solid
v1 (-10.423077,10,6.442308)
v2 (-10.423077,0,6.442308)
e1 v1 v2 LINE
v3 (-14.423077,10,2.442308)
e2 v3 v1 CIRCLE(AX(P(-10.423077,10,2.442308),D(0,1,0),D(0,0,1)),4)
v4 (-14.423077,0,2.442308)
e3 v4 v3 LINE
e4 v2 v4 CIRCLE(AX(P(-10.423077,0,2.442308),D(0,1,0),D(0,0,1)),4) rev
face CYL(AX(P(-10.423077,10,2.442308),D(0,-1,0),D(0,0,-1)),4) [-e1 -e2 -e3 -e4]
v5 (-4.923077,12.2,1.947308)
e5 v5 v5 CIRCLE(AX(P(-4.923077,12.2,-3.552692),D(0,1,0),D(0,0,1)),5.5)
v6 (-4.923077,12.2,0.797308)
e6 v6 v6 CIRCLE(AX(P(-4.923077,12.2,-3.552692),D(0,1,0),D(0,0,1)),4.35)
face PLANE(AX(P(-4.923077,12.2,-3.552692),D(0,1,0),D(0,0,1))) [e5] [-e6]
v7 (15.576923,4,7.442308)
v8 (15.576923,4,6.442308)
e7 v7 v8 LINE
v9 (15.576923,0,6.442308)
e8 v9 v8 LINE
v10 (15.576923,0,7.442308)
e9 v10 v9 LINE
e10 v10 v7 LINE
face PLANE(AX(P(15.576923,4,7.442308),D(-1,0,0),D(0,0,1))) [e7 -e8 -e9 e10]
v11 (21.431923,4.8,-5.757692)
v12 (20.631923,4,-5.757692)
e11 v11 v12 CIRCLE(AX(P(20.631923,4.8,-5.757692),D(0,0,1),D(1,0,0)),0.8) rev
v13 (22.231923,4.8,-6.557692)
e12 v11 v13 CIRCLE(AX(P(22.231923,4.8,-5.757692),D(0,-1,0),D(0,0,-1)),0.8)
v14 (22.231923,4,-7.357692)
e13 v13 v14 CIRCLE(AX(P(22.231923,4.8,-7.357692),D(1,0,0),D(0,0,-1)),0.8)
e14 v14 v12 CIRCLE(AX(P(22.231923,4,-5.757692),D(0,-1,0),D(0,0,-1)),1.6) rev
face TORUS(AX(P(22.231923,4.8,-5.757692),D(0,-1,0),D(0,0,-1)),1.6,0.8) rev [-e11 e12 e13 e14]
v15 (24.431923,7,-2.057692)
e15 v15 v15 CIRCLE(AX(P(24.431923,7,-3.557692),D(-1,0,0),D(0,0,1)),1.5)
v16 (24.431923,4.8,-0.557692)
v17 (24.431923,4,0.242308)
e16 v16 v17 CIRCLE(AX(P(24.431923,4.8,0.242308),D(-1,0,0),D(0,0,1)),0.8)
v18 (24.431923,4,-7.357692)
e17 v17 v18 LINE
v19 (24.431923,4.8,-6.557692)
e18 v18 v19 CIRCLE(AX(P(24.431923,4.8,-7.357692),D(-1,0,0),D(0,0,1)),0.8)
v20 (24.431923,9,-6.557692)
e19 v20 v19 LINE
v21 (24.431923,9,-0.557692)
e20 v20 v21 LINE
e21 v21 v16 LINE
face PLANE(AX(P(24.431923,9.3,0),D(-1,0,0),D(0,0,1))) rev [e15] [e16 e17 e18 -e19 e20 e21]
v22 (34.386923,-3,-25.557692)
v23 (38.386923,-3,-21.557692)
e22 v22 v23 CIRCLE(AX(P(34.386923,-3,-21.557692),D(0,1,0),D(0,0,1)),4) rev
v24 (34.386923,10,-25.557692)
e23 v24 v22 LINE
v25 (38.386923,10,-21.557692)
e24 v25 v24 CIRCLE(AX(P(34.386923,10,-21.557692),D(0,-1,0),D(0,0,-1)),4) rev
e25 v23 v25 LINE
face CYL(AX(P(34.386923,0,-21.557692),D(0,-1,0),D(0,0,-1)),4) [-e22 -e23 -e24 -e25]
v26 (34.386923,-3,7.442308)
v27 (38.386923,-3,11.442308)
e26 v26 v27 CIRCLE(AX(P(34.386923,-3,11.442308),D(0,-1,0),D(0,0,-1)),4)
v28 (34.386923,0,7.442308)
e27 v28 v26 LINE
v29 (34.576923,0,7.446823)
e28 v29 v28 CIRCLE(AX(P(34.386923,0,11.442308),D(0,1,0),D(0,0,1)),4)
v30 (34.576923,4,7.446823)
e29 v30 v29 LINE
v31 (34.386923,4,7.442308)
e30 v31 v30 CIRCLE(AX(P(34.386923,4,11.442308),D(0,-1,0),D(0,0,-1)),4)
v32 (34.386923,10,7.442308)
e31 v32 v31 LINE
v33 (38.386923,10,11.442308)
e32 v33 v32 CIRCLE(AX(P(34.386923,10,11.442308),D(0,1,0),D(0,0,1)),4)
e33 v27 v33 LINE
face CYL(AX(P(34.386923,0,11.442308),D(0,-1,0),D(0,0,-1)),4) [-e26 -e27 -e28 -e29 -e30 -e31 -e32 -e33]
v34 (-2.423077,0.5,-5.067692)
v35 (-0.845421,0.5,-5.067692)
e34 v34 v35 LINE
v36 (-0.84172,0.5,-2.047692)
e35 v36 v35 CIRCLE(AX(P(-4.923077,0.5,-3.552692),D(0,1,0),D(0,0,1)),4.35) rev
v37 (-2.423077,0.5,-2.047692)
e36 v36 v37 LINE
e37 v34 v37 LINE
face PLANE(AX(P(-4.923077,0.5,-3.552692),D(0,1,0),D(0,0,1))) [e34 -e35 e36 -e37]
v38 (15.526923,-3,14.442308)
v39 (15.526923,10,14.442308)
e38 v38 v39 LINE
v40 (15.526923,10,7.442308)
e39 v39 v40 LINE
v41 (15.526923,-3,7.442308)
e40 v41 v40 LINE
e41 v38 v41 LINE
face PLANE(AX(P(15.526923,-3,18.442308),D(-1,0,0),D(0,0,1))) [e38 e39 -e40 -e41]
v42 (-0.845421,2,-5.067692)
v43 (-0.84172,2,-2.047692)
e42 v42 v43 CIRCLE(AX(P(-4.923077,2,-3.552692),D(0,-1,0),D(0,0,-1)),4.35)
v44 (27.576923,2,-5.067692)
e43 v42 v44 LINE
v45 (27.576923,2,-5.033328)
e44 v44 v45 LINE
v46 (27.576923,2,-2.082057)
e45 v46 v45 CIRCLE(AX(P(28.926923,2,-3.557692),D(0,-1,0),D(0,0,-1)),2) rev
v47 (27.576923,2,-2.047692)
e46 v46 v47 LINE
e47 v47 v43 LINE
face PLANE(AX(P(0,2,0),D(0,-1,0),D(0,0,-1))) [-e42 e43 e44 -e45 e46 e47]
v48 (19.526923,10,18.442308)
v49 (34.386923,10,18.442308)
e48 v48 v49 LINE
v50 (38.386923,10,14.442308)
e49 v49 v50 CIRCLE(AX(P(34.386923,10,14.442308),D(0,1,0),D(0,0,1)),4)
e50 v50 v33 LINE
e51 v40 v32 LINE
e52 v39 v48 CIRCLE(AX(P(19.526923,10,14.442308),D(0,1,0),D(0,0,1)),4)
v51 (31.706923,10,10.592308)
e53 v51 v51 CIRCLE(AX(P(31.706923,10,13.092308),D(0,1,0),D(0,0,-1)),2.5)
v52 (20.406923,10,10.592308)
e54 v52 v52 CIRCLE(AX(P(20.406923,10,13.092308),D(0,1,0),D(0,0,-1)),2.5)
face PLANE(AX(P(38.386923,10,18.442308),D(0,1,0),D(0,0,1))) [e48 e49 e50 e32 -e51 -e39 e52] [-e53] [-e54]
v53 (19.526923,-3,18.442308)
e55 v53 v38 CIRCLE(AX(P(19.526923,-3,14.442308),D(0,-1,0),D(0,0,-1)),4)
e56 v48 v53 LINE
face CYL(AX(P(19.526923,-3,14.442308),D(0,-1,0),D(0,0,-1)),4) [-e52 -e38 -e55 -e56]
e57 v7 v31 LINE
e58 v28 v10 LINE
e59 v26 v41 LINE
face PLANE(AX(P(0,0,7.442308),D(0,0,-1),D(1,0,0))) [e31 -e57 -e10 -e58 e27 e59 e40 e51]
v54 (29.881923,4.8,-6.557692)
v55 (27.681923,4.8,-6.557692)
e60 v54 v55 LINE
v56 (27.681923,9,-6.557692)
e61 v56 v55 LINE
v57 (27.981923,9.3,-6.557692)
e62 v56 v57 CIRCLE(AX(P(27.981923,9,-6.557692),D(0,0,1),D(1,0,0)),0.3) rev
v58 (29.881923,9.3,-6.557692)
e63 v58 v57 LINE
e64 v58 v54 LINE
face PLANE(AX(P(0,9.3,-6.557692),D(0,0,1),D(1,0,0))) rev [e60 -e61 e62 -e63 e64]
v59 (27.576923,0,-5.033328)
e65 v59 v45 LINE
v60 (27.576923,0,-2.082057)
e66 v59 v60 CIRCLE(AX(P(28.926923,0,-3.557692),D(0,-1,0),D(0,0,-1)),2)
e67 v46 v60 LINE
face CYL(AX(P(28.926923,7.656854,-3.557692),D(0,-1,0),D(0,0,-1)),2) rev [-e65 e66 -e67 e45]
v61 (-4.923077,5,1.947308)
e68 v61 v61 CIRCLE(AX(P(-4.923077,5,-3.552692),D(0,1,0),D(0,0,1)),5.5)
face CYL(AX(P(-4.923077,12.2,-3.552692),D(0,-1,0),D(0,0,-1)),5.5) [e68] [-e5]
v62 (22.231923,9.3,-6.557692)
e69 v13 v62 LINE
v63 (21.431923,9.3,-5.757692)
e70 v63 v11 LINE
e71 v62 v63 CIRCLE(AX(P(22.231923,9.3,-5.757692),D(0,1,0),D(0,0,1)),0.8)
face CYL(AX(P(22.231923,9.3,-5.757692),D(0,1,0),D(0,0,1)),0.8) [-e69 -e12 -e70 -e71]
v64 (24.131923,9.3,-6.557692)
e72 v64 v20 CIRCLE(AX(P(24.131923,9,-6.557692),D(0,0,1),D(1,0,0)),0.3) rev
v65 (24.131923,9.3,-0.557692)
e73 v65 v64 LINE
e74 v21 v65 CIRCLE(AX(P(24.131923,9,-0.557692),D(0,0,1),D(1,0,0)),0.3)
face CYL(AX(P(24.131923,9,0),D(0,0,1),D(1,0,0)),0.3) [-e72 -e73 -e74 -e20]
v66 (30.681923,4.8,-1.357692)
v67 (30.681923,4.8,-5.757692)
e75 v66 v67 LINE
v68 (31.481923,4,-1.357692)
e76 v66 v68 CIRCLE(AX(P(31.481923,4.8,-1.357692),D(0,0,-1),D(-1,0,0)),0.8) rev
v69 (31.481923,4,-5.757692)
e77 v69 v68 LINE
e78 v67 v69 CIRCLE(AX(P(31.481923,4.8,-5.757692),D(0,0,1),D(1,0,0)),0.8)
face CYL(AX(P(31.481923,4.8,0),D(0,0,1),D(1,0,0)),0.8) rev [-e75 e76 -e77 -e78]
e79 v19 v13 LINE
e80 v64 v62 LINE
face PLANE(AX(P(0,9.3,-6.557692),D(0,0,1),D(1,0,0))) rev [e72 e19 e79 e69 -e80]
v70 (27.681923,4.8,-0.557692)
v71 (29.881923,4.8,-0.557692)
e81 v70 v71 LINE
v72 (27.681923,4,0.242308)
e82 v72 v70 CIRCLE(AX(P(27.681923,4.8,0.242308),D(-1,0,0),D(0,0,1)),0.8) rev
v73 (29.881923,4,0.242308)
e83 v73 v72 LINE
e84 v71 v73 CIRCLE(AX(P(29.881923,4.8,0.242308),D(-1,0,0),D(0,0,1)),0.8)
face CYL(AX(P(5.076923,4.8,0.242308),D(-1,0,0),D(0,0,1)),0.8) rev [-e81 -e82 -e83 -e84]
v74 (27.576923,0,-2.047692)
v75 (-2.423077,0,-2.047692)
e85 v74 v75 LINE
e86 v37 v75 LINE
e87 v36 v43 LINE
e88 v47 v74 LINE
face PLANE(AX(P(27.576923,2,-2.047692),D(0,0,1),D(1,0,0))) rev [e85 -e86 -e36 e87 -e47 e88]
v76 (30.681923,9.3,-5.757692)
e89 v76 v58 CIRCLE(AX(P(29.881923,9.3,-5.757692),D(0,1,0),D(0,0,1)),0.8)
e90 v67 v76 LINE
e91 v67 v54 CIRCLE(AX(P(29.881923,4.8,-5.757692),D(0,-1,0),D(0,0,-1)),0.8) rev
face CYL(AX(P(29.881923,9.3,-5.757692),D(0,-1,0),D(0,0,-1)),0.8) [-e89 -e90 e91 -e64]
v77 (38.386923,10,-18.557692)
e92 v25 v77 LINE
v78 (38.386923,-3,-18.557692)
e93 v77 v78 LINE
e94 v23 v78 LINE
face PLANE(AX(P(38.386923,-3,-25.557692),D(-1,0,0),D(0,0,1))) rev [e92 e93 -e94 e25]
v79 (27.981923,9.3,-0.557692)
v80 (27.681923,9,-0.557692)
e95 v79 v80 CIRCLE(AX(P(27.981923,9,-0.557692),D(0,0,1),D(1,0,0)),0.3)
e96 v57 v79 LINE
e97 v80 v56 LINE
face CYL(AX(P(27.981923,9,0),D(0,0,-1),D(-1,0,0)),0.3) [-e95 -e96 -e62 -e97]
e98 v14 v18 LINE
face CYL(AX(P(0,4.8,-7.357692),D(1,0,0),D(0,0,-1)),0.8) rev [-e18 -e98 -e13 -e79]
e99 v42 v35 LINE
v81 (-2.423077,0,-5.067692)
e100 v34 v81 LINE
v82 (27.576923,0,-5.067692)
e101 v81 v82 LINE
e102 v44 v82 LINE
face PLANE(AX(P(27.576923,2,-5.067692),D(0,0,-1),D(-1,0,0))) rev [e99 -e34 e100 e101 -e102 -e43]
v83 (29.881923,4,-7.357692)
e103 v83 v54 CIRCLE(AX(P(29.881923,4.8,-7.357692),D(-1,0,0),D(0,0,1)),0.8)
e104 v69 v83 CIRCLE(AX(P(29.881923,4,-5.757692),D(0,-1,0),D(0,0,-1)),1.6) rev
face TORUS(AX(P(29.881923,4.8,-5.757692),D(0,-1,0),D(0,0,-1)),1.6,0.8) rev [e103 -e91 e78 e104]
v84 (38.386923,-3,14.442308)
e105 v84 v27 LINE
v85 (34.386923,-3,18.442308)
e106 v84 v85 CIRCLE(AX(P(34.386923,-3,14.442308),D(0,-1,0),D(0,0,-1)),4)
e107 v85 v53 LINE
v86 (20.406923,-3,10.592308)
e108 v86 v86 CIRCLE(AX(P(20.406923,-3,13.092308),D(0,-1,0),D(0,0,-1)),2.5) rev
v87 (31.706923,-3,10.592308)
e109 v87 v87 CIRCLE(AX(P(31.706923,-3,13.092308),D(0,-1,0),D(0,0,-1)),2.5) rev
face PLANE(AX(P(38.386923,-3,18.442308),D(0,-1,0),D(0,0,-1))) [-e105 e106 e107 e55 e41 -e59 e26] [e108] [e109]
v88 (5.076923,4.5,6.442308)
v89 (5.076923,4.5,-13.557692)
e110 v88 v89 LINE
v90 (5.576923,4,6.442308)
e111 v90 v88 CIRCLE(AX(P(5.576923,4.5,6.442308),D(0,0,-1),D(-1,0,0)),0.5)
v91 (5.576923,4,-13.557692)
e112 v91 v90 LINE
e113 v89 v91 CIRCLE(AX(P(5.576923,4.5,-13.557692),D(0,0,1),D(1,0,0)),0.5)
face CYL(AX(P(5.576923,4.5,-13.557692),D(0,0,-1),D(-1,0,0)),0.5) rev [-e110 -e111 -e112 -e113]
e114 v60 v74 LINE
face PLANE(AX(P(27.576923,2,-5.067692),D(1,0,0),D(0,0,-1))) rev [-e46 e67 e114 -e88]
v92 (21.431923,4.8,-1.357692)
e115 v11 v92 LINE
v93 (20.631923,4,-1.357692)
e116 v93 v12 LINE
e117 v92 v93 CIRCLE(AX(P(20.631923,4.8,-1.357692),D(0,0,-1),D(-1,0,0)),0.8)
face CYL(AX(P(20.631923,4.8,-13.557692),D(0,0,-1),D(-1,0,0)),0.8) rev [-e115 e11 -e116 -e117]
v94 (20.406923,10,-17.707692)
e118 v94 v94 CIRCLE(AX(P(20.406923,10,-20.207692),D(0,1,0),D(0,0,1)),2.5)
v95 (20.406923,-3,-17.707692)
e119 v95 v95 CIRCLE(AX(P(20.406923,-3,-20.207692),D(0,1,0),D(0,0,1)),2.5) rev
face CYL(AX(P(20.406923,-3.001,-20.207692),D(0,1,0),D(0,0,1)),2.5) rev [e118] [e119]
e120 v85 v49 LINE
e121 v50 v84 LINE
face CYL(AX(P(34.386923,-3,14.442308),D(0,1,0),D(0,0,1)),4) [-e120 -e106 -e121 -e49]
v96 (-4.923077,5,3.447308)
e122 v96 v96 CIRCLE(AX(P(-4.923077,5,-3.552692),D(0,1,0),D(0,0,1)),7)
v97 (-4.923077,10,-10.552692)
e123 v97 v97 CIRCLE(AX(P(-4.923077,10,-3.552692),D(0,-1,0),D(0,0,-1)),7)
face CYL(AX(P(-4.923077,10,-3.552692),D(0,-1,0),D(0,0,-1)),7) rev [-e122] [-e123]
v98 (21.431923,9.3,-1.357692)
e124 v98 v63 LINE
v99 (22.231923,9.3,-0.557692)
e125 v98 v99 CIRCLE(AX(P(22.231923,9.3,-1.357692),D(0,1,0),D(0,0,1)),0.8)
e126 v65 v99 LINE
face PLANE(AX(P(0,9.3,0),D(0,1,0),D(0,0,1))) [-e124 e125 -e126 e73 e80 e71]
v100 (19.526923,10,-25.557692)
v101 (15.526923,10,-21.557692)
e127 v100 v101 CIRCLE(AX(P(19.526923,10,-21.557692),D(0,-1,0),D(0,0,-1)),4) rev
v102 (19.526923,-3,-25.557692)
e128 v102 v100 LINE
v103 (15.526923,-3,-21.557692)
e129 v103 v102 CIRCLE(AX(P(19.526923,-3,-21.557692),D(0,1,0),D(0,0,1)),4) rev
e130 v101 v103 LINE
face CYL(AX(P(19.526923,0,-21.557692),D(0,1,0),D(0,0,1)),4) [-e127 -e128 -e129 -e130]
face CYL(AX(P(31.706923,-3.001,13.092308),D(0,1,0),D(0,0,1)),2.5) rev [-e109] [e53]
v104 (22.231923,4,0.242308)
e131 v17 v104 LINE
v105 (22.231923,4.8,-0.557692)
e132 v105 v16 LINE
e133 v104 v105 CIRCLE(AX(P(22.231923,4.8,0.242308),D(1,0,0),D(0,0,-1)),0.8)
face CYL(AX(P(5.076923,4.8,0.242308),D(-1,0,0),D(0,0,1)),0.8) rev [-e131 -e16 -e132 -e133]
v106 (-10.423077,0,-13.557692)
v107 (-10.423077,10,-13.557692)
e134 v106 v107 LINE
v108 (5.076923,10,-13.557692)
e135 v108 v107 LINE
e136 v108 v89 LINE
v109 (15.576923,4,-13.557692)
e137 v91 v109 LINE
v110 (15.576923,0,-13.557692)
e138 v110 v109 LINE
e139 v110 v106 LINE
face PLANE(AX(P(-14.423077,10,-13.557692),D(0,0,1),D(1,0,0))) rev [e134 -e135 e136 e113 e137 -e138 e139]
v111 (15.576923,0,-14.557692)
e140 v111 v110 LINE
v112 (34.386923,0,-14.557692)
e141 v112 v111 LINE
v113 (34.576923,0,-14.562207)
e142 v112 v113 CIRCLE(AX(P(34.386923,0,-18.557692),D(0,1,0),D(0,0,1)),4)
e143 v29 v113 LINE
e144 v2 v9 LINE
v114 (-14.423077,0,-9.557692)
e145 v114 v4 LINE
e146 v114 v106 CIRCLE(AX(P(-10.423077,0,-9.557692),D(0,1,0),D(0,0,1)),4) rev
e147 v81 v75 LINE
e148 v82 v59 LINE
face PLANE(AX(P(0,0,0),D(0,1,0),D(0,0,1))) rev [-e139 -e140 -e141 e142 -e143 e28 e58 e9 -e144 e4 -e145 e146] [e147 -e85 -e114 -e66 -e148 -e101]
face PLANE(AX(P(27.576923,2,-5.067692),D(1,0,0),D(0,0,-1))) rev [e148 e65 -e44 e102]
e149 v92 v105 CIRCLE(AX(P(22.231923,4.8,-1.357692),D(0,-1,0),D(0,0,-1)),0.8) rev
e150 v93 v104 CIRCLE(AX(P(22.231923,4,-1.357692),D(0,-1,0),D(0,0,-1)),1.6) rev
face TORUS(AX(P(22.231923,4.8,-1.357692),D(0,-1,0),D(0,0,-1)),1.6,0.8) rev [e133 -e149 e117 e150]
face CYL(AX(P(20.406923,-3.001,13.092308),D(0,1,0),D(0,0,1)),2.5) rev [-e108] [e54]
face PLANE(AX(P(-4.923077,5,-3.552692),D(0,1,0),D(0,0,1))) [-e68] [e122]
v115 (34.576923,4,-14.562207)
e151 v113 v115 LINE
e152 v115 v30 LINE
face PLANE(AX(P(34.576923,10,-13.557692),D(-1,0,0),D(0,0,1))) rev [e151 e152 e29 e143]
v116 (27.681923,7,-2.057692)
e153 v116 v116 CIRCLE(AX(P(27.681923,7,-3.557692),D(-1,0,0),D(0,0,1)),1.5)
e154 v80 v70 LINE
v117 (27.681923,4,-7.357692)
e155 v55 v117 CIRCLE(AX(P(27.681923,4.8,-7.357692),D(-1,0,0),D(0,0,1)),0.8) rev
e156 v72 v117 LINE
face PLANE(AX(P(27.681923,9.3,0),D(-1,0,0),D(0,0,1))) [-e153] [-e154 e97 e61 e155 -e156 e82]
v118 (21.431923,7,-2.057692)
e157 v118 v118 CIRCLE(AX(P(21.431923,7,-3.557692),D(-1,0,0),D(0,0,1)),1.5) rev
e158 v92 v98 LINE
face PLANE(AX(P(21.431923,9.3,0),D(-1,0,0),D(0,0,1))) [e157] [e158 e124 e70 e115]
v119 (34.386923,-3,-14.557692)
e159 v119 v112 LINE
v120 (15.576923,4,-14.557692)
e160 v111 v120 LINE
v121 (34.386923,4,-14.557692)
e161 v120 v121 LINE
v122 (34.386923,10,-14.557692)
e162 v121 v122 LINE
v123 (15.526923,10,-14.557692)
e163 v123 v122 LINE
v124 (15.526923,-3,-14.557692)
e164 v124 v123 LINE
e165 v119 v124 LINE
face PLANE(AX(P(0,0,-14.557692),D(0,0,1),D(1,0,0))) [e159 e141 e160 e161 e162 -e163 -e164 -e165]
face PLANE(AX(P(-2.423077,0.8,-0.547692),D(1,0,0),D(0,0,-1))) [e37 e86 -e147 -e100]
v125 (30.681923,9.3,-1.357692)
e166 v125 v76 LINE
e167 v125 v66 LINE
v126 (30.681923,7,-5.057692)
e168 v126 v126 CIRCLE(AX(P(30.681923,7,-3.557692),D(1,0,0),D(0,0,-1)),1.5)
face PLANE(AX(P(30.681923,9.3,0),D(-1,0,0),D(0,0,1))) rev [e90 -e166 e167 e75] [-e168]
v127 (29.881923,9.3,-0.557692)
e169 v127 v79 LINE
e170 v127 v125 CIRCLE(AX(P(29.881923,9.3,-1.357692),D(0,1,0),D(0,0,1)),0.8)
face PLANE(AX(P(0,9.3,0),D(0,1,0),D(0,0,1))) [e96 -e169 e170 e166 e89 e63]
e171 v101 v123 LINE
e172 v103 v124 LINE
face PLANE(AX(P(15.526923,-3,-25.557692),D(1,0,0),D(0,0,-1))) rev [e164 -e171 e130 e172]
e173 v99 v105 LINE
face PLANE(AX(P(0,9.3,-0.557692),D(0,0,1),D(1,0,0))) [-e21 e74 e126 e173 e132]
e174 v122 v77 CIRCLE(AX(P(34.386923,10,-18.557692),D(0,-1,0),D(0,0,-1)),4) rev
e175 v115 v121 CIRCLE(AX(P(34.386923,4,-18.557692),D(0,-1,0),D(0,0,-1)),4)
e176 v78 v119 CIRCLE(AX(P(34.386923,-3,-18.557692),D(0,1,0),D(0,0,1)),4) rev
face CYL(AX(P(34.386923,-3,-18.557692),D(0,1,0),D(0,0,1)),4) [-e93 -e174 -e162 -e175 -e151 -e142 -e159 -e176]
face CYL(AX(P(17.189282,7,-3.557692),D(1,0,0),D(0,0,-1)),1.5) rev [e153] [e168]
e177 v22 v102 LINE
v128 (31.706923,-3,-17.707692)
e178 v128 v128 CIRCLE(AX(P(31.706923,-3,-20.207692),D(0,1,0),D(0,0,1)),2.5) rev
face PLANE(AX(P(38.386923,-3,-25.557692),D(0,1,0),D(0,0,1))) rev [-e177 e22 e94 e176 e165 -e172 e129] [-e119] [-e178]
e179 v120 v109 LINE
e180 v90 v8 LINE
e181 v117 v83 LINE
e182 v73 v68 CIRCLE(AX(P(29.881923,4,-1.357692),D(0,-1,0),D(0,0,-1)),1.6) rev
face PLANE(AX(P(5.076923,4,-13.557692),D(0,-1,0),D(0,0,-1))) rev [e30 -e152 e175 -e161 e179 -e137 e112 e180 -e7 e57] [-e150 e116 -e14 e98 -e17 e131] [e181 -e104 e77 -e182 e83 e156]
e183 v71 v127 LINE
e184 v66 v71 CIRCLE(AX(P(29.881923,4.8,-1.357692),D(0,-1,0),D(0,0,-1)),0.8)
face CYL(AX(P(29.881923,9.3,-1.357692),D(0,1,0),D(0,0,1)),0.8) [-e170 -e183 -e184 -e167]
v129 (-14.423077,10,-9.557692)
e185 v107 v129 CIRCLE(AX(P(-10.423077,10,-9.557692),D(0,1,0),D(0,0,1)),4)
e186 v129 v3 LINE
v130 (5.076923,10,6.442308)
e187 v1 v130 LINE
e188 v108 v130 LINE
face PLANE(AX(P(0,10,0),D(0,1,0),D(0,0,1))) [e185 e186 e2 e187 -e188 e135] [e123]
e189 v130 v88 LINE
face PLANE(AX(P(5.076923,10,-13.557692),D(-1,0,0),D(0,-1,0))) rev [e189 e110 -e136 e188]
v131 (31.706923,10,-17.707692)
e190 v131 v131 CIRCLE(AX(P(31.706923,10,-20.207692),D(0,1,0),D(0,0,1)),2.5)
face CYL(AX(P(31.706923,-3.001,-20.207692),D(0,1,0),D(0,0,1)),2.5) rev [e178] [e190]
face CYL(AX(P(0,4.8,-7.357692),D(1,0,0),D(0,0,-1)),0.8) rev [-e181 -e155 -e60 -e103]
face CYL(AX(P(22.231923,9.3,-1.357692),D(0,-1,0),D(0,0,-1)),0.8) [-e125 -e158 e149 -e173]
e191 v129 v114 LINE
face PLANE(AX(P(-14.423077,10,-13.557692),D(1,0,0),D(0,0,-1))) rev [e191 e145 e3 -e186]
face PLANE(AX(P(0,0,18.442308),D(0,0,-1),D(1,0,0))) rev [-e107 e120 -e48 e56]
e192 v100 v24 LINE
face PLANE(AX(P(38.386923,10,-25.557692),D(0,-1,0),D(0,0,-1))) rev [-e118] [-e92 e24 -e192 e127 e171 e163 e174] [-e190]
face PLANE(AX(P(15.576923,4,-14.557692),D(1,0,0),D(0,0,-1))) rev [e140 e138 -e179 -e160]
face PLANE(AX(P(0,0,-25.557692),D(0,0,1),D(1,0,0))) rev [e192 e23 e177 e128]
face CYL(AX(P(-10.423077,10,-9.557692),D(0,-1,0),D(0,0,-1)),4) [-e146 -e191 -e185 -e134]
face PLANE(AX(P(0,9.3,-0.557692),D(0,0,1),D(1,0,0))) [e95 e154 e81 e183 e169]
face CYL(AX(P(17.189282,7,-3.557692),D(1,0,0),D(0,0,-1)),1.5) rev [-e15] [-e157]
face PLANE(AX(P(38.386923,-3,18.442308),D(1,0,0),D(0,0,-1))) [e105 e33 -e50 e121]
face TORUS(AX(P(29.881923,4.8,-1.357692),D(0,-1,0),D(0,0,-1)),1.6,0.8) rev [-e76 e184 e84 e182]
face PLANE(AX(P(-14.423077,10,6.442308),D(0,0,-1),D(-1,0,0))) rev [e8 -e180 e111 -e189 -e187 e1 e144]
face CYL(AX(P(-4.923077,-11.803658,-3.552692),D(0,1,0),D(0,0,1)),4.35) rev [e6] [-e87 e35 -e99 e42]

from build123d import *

# Parameters (mm, degrees)
SKETCH2_W            = 49
SKETCH2_H            = 20
BOSS_EXTRUDE1_DEPTH  = 10
SKETCH3_W            = 30
SKETCH3_H            = 3.02
CUT_EXTRUDE1_DEPTH   = 2
SKETCH4_W            = 5
SKETCH4_H            = 6
CUT_EXTRUDE2_DEPTH   = 5
SKETCH5_R            = 7
CUT_EXTRUDE3_DEPTH   = 38.474986727
SKETCH12_W           = 5
SKETCH12_H           = 6
BOSS_EXTRUDE4_DEPTH  = 0.8
SKETCH14_W           = 29.5
SKETCH14_H           = 6
CUT_EXTRUDE6_DEPTH   = 42.177221974
SKETCH20_W           = 5
SKETCH20_H           = 6
BOSS_EXTRUDE6_DEPTH  = 4.2
SKETCH21_R           = 4.6
CUT_EXTRUDE8_DEPTH   = 0.5
SKETCH22_R           = 3.825
CUT_EXTRUDE9_DEPTH   = 4
SKETCH24_R           = 4.6
SKETCH24_R_2         = 4.25
CUT_EXTRUDE11_DEPTH  = 1
BOSS_EXTRUDE9_START  = 0.5
SKETCH26_R           = 4.25
SKETCH26_R_2         = 3.825
BOSS_EXTRUDE9_DEPTH  = 0.5
SKETCH27_R           = 7
SKETCH27_R_2         = 4.6
CUT_EXTRUDE12_DEPTH  = 1
FILLET1_R            = 0.5
SKETCH56_R           = 2
CUT_EXTRUDE13_DEPTH  = 2
SKETCH57_W           = 3
SKETCH57_H           = 6
BOSS_EXTRUDE19_DEPTH = 5.3
CUT_EXTRUDE14_REACH  = 50.148
SKETCH58_R           = 1.5
FILLET2_R            = 0.3
FILLET3_R            = 0.8
SKETCH60_W           = 19
SKETCH60_H           = 4
BOSS_EXTRUDE21_DEPTH = 1
SKETCH59_W           = 22.86
SKETCH59_H           = 13
BOSS_EXTRUDE20_DEPTH = 11
CUT_EXTRUDE15_REACH  = 49.914
SKETCH61_R           = 2.5
FILLET4_R            = 4
SKETCH65_R           = 7
SKETCH65_R_2         = 4.25
BOSS_EXTRUDE24_DEPTH = 1
CUT_EXTRUDE17_REACH  = 48.805
SKETCH66_R           = 4.35
BOSS_EXTRUDE25_START = 7.2
SKETCH67_R           = 5.5
SKETCH67_R_2         = 4.35
BOSS_EXTRUDE25_DEPTH = 7.2


with BuildPart() as part:
    # Sketch2 → Boss-Extrude1 (new body)
    with BuildSketch(Plane(origin=(0, 0, 0), x_dir=(1, 0, 0), z_dir=(0, 1, 0))):
        with Locations((10.076923077, 3.557692308)):
            Rectangle(SKETCH2_W, SKETCH2_H)
    extrude(amount=BOSS_EXTRUDE1_DEPTH)

    # Sketch3 → Cut-Extrude1 (cut)
    with BuildSketch(Plane.XZ):
        with Locations((12.576923077, -3.557692308)):
            Rectangle(SKETCH3_W, SKETCH3_H)
    extrude(amount=-CUT_EXTRUDE1_DEPTH, mode=Mode.SUBTRACT)

    # Sketch4 → Cut-Extrude2 (cut)
    with BuildSketch(Plane.XZ):
        with Locations((-4.923076923, -3.547692308)):
            Rectangle(SKETCH4_W, SKETCH4_H)
    extrude(amount=-CUT_EXTRUDE2_DEPTH, mode=Mode.SUBTRACT)

    # Sketch5 → Cut-Extrude3 (cut, through all)
    with BuildSketch(Plane.XZ.offset(-5)):
        with Locations(Location((-4.923076923, -3.552692308, 0), (0, 0, 270))):
            Circle(SKETCH5_R)
    extrude(amount=-CUT_EXTRUDE3_DEPTH, mode=Mode.SUBTRACT)

    # Sketch12 → Boss-Extrude4 (add)
    with BuildSketch(Plane.XZ):
        with Locations((-4.923076923, -3.547692308)):
            Rectangle(SKETCH12_W, SKETCH12_H)
    extrude(amount=-BOSS_EXTRUDE4_DEPTH)

    # Sketch14 → Cut-Extrude6 (cut, through all)
    with BuildSketch(Plane.XY.offset(6.442307692)):
        with Locations((19.826923077, 7)):
            Rectangle(SKETCH14_W, SKETCH14_H)
    extrude(amount=-CUT_EXTRUDE6_DEPTH, mode=Mode.SUBTRACT)

    # Sketch20 → Boss-Extrude6 (add)
    with BuildSketch(Plane(origin=(0, 0.8, 0), x_dir=(1, 0, 0), z_dir=(0, 1, 0))):
        with Locations((-4.923076923, 3.547692308)):
            Rectangle(SKETCH20_W, SKETCH20_H)
    extrude(amount=BOSS_EXTRUDE6_DEPTH)

    # Sketch21 → Cut-Extrude8 (cut)
    with BuildSketch(Plane(origin=(0, 5, 0), x_dir=(1, 0, 0), z_dir=(0, 1, 0))):
        with Locations(Location((-4.923076923, 3.552692308, 0), (0, 0, 270))):
            Circle(SKETCH21_R)
    extrude(amount=-CUT_EXTRUDE8_DEPTH, mode=Mode.SUBTRACT)

    # Sketch22 → Cut-Extrude9 (cut)
    with BuildSketch(Plane(origin=(0, 4.5, 0), x_dir=(1, 0, 0), z_dir=(0, 1, 0))):
        with Locations(Location((-4.923076923, 3.552692308, 0), (0, 0, 270))):
            Circle(SKETCH22_R)
    extrude(amount=-CUT_EXTRUDE9_DEPTH, mode=Mode.SUBTRACT)

    # Sketch24 → Cut-Extrude11 (cut)
    with BuildSketch(Plane(origin=(0, 5, 0), x_dir=(1, 0, 0), z_dir=(0, 1, 0))):
        with Locations(Location((-4.923076923, 3.552692308, 0), (0, 0, 270))):
            Circle(SKETCH24_R)
        with Locations(Location((-4.923076923, 3.552692308, 0), (0, 0, 270))):
            Circle(SKETCH24_R_2, mode=Mode.SUBTRACT)
    extrude(amount=-CUT_EXTRUDE11_DEPTH, mode=Mode.SUBTRACT)

    # Sketch26 → Boss-Extrude9 (add)
    with BuildSketch(Plane(origin=(0, 4.5, 0), x_dir=(1, 0, 0), z_dir=(0, 1, 0)).offset(BOSS_EXTRUDE9_START)):
        with Locations(Location((-4.923076923, 3.552692308, 0), (0, 0, 270))):
            Circle(SKETCH26_R)
        with Locations(Location((-4.923076923, 3.552692308, 0), (0, 0, 270))):
            Circle(SKETCH26_R_2, mode=Mode.SUBTRACT)
    extrude(amount=-BOSS_EXTRUDE9_DEPTH)

    # Sketch27 → Cut-Extrude12 (cut)
    with BuildSketch(Plane(origin=(0, 5, 0), x_dir=(1, 0, 0), z_dir=(0, 1, 0))):
        with Locations(Location((-4.923076923, 3.552692308, 0), (0, 0, 90))):
            Circle(SKETCH27_R)
        with Locations((-4.923076923, 3.552692308)):
            Circle(SKETCH27_R_2, mode=Mode.SUBTRACT)
    extrude(amount=-CUT_EXTRUDE12_DEPTH, mode=Mode.SUBTRACT)

    # Fillet1
    fillet1_edges = [part.edges().sort_by_distance(p)[0] for p in [
        (5.076923077, 4, -3.557692308),
    ]]
    fillet(fillet1_edges, radius=FILLET1_R)

    # Sketch56 → Cut-Extrude13 (cut)
    with BuildSketch(Plane.XZ):
        with Locations((28.926923077, -3.557692308)):
            Circle(SKETCH56_R)
    extrude(amount=-CUT_EXTRUDE13_DEPTH, mode=Mode.SUBTRACT)

    # Sketch57 → Boss-Extrude19 (add)
    with BuildSketch(Plane(origin=(0, 4, 0), x_dir=(1, 0, 0), z_dir=(0, 1, 0))):
        with Locations((29.181923077, 3.557692308)):
            Rectangle(SKETCH57_W, SKETCH57_H)
        with Locations((22.931923077, 3.557692308)):
            Rectangle(SKETCH57_W, SKETCH57_H)
    extrude(amount=BOSS_EXTRUDE19_DEPTH)

    # Cut-Extrude14: up to this face of the body (flat: up to its plane)
    cut_extrude14_end = Plane(part.part.faces().sort_by_distance((21.431923077, 6.65, -3.557692308))[0])
    # Sketch58 → Cut-Extrude14 (cut, up to the picked face)
    with BuildSketch(Plane(origin=(30.681923077, 0, 0), x_dir=(0, 0, -1), z_dir=(1, 0, 0)), mode=Mode.PRIVATE) as cut_extrude14_sk1:
        with Locations(Location((3.557692308, 7, 0), (0, 0, 180))):
            Circle(SKETCH58_R)
    cut_extrude14_tool1 = split(extrude(cut_extrude14_sk1.sketch, amount=-CUT_EXTRUDE14_REACH, mode=Mode.PRIVATE), bisect_by=cut_extrude14_end, keep=Keep.BOTH, mode=Mode.PRIVATE)
    add(cut_extrude14_tool1.solids().sort_by(Axis((30.681923, 7, -3.557692), (-1, 0, 0)))[0], mode=Mode.SUBTRACT)

    # Fillet2
    fillet2_edges = [part.edges().sort_by_distance(p)[0] for p in [
        (27.681923077, 9.3, -3.557692308),
        (24.431923077, 9.3, -3.557692308),
    ]]
    fillet(fillet2_edges, radius=FILLET2_R)

    # Fillet3
    fillet3_edges = [part.edges().sort_by_distance(p)[0] for p in [
        (30.681923077, 4, -3.557692308),
        (30.681923077, 6.65, -0.557692308),
        (29.181923077, 4, -6.557692308),
        (30.681923077, 6.65, -6.557692308),
        (29.181923077, 4, -0.557692308),
        (21.431923077, 6.65, -6.557692308),
        (21.431923077, 6.65, -0.557692308),
        (22.931923077, 4, -6.557692308),
        (21.431923077, 4, -3.557692308),
        (22.931923077, 4, -0.557692308),
    ]]
    fillet(fillet3_edges, radius=FILLET3_R)

    # Sketch60 → Boss-Extrude21 (add)
    with BuildSketch(Plane(origin=(0, 0, -13.557692308), x_dir=(-1, 0, 0), z_dir=(0, 0, -1))):
        with Locations((-25.076923077, 2)):
            Rectangle(SKETCH60_W, SKETCH60_H)
    boss_extrude21 = extrude(amount=BOSS_EXTRUDE21_DEPTH)

    # Sketch59 → Boss-Extrude20 (add)
    with BuildSketch(Plane(origin=(0, 0, -14.557692308), x_dir=(-1, 0, 0), z_dir=(0, 0, -1))):
        with Locations((-26.956923077, 3.5)):
            Rectangle(SKETCH59_W, SKETCH59_H)
    boss_extrude20 = extrude(amount=BOSS_EXTRUDE20_DEPTH)

    # Mirror4: Boss-Extrude21, Boss-Extrude20 across plane
    add(boss_extrude21.mirror(Plane(origin=(0, 0, -3.557692308), x_dir=(1, 0, 0), z_dir=(0, 0, -1))))
    add(boss_extrude20.mirror(Plane(origin=(0, 0, -3.557692308), x_dir=(1, 0, 0), z_dir=(0, 0, -1))))

    # Sketch61 → Cut-Extrude15 (cut, up to next)
    with BuildSketch(Plane(origin=(0, 10, 0), x_dir=(1, 0, 0), z_dir=(0, 1, 0)), mode=Mode.PRIVATE) as cut_extrude15_sk1:
        with Locations(Location((20.406923077, 20.207692308, 0), (0, 0, 270))):
            Circle(SKETCH61_R)
    cut_extrude15_tool1 = extrude(cut_extrude15_sk1.sketch, amount=-CUT_EXTRUDE15_REACH, mode=Mode.PRIVATE) & part.part
    # Sketch61 → Cut-Extrude15 (cut, up to next)
    with BuildSketch(Plane(origin=(0, 10, 0), x_dir=(1, 0, 0), z_dir=(0, 1, 0)), mode=Mode.PRIVATE) as cut_extrude15_sk2:
        with Locations(Location((31.706923077, 20.207692308, 0), (0, 0, 270))):
            Circle(SKETCH61_R)
    cut_extrude15_tool2 = extrude(cut_extrude15_sk2.sketch, amount=-CUT_EXTRUDE15_REACH, mode=Mode.PRIVATE) & part.part
    # Sketch61 → Cut-Extrude15 (cut, up to next)
    with BuildSketch(Plane(origin=(0, 10, 0), x_dir=(1, 0, 0), z_dir=(0, 1, 0)), mode=Mode.PRIVATE) as cut_extrude15_sk3:
        with Locations(Location((31.706923077, -13.092307692, 0), (0, 0, 90))):
            Circle(SKETCH61_R)
    cut_extrude15_tool3 = extrude(cut_extrude15_sk3.sketch, amount=-CUT_EXTRUDE15_REACH, mode=Mode.PRIVATE) & part.part
    # Sketch61 → Cut-Extrude15 (cut, up to next)
    with BuildSketch(Plane(origin=(0, 10, 0), x_dir=(1, 0, 0), z_dir=(0, 1, 0)), mode=Mode.PRIVATE) as cut_extrude15_sk4:
        with Locations(Location((20.406923077, -13.092307692, 0), (0, 0, 90))):
            Circle(SKETCH61_R)
    cut_extrude15_tool4 = extrude(cut_extrude15_sk4.sketch, amount=-CUT_EXTRUDE15_REACH, mode=Mode.PRIVATE) & part.part
    add(cut_extrude15_tool1.solids().sort_by_distance((20.406923, 10, -20.207692))[0], mode=Mode.SUBTRACT)
    add(cut_extrude15_tool2.solids().sort_by_distance((31.706923, 10, -20.207692))[0], mode=Mode.SUBTRACT)
    add(cut_extrude15_tool3.solids().sort_by_distance((31.706923, 10, 13.092308))[0], mode=Mode.SUBTRACT)
    add(cut_extrude15_tool4.solids().sort_by_distance((20.406923, 10, 13.092308))[0], mode=Mode.SUBTRACT)

    # Fillet4
    # the kernel refuses this fillet: 4 mm, written as the material it takes off along each edge
    with BuildSketch(Plane(origin=(38.386923077, 20, -25.557692308), x_dir=(0, 0, 1), z_dir=(0, -1, 0)), Plane(origin=(15.526923077, -13, 18.442307692), x_dir=(1, 0, 0), z_dir=(0, 1, 0)), Plane(origin=(15.526923077, -13, -25.557692308), x_dir=(0, 0, 1), z_dir=(0, 1, 0))) as fillet4_piece_1:
        with BuildLine():
            CenterArc((FILLET4_R, FILLET4_R), FILLET4_R, 180, 90)
            Line((0, FILLET4_R), (0, 0))
            Line((0, 0), (FILLET4_R, 0))
        make_face()
    extrude(amount=33, mode=Mode.SUBTRACT)
    with BuildSketch(Plane(origin=(38.386923077, 20, 7.442307692), x_dir=(0, 0, 1), z_dir=(0, -1, 0))) as fillet4_piece_2_section:
        with BuildLine():
            CenterArc((FILLET4_R, FILLET4_R), FILLET4_R, 180, 90)
            Line((0, FILLET4_R), (0, 0))
            Line((0, 0), (FILLET4_R, 0))
        make_face()
    fillet4_piece_2 = extrude(amount=33, mode=Mode.PRIVATE)
    fillet4_piece_2 = split(fillet4_piece_2, bisect_by=Plane(origin=(34.576923077, 12, 8.351487897), z_dir=(1, 0, 0)), keep=Keep.TOP, mode=Mode.PRIVATE)
    fillet4_piece_2 = split(fillet4_piece_2, bisect_by=Plane(origin=(37.49276705, 4, 8.351487897), z_dir=(0, 1, 0)), keep=Keep.TOP, mode=Mode.PRIVATE)
    add(fillet4_piece_2, mode=Mode.SUBTRACT)
    with BuildSketch(Plane(origin=(38.386923077, 20, 7.442307692), x_dir=(0, 0, 1), z_dir=(0, -1, 0))) as fillet4_piece_3_section:
        with BuildLine():
            CenterArc((FILLET4_R, FILLET4_R), FILLET4_R, 180, 90)
            Line((0, FILLET4_R), (0, 0))
            Line((0, 0), (FILLET4_R, 0))
        make_face()
    fillet4_piece_3 = extrude(amount=33, mode=Mode.PRIVATE)
    fillet4_piece_3 = split(fillet4_piece_3, bisect_by=Plane(origin=(34.576923077, 12, 7.403071145), z_dir=(-1, 0, 0)), keep=Keep.TOP, mode=Mode.PRIVATE)
    fillet4_piece_3 = split(fillet4_piece_3, bisect_by=Plane(origin=(34.482800084, 4, 7.403071145), z_dir=(0, 1, 0)), keep=Keep.TOP, mode=Mode.PRIVATE)
    add(fillet4_piece_3, mode=Mode.SUBTRACT)
    with BuildSketch(Plane(origin=(38.386923077, 20, 7.442307692), x_dir=(0, 0, 1), z_dir=(0, -1, 0))) as fillet4_piece_4_section:
        with BuildLine():
            CenterArc((FILLET4_R, FILLET4_R), FILLET4_R, 180, 90)
            Line((0, FILLET4_R), (0, 0))
            Line((0, 0), (FILLET4_R, 0))
        make_face()
    fillet4_piece_4 = extrude(amount=33, mode=Mode.PRIVATE)
    fillet4_piece_4 = split(fillet4_piece_4, bisect_by=Plane(origin=(34.576923077, 2, 8.351487897), z_dir=(1, 0, 0)), keep=Keep.TOP, mode=Mode.PRIVATE)
    fillet4_piece_4 = split(fillet4_piece_4, bisect_by=Plane(origin=(37.49276705, 0, 8.351487897), z_dir=(0, 1, 0)), keep=Keep.TOP, mode=Mode.PRIVATE)
    fillet4_piece_4 = split(fillet4_piece_4, bisect_by=Plane(origin=(37.49276705, 4, 8.351487897), z_dir=(0, -1, 0)), keep=Keep.TOP, mode=Mode.PRIVATE)
    add(fillet4_piece_4, mode=Mode.SUBTRACT)
    with BuildSketch(Plane(origin=(38.386923077, 20, 7.442307692), x_dir=(0, 0, 1), z_dir=(0, -1, 0))) as fillet4_piece_5_section:
        with BuildLine():
            CenterArc((FILLET4_R, FILLET4_R), FILLET4_R, 180, 90)
            Line((0, FILLET4_R), (0, 0))
            Line((0, 0), (FILLET4_R, 0))
        make_face()
    fillet4_piece_5 = extrude(amount=33, mode=Mode.PRIVATE)
    fillet4_piece_5 = split(fillet4_piece_5, bisect_by=Plane(origin=(34.576923077, -6.5, 8.351487897), z_dir=(1, 0, 0)), keep=Keep.TOP, mode=Mode.PRIVATE)
    fillet4_piece_5 = split(fillet4_piece_5, bisect_by=Plane(origin=(37.49276705, 0, 8.351487897), z_dir=(0, -1, 0)), keep=Keep.TOP, mode=Mode.PRIVATE)
    add(fillet4_piece_5, mode=Mode.SUBTRACT)
    with BuildSketch(Plane(origin=(38.386923077, 20, 7.442307692), x_dir=(0, 0, 1), z_dir=(0, -1, 0))) as fillet4_piece_6_section:
        with BuildLine():
            CenterArc((FILLET4_R, FILLET4_R), FILLET4_R, 180, 90)
            Line((0, FILLET4_R), (0, 0))
            Line((0, 0), (FILLET4_R, 0))
        make_face()
    fillet4_piece_6 = extrude(amount=33, mode=Mode.PRIVATE)
    fillet4_piece_6 = split(fillet4_piece_6, bisect_by=Plane(origin=(34.576923077, -6.5, 7.403071145), z_dir=(-1, 0, 0)), keep=Keep.TOP, mode=Mode.PRIVATE)
    fillet4_piece_6 = split(fillet4_piece_6, bisect_by=Plane(origin=(34.482800084, 0, 7.403071145), z_dir=(0, -1, 0)), keep=Keep.TOP, mode=Mode.PRIVATE)
    add(fillet4_piece_6, mode=Mode.SUBTRACT)
    with BuildSketch(Plane(origin=(38.386923077, 20, 18.442307692), x_dir=(0, 0, -1), z_dir=(0, -1, 0))) as fillet4_piece_7:
        with BuildLine():
            CenterArc((FILLET4_R, -FILLET4_R), FILLET4_R, 90, 90)
            Line((0, -FILLET4_R), (0, 0))
            Line((0, 0), (FILLET4_R, 0))
        make_face()
    extrude(amount=33, mode=Mode.SUBTRACT)
    with BuildSketch(Plane(origin=(-14.423076923, -10, -13.557692308), x_dir=(1, 0, 0), z_dir=(0, 1, 0))) as fillet4_piece_8:
        with BuildLine():
            CenterArc((FILLET4_R, -FILLET4_R), FILLET4_R, 90, 90)
            Line((0, -FILLET4_R), (0, 0))
            Line((0, 0), (FILLET4_R, 0))
        make_face()
    extrude(amount=30, mode=Mode.SUBTRACT)
    with BuildSketch(Plane(origin=(-14.423076923, -10, 6.442307692), x_dir=(1, 0, 0), z_dir=(0, 1, 0))) as fillet4_piece_9:
        with BuildLine():
            CenterArc((FILLET4_R, FILLET4_R), FILLET4_R, 180, 90)
            Line((0, FILLET4_R), (0, 0))
            Line((0, 0), (FILLET4_R, 0))
        make_face()
    extrude(amount=30, mode=Mode.SUBTRACT)
    with BuildSketch(Plane(origin=(38.386923077, 20, -14.557692308), x_dir=(-1, 0, 0), z_dir=(0, -1, 0))) as fillet4_piece_10_section:
        with BuildLine():
            CenterArc((FILLET4_R, FILLET4_R), FILLET4_R, 180, 90)
            Line((0, FILLET4_R), (0, 0))
            Line((0, 0), (FILLET4_R, 0))
        make_face()
    fillet4_piece_10 = extrude(amount=33, mode=Mode.PRIVATE)
    fillet4_piece_10 = split(fillet4_piece_10, bisect_by=Plane(origin=(34.576923077, 12, -14.51845576), z_dir=(-1, 0, 0)), keep=Keep.TOP, mode=Mode.PRIVATE)
    fillet4_piece_10 = split(fillet4_piece_10, bisect_by=Plane(origin=(34.482800084, 4, -14.51845576), z_dir=(0, 1, 0)), keep=Keep.TOP, mode=Mode.PRIVATE)
    add(fillet4_piece_10, mode=Mode.SUBTRACT)
    with BuildSketch(Plane(origin=(38.386923077, 20, -14.557692308), x_dir=(-1, 0, 0), z_dir=(0, -1, 0))) as fillet4_piece_11_section:
        with BuildLine():
            CenterArc((FILLET4_R, FILLET4_R), FILLET4_R, 180, 90)
            Line((0, FILLET4_R), (0, 0))
            Line((0, 0), (FILLET4_R, 0))
        make_face()
    fillet4_piece_11 = extrude(amount=33, mode=Mode.PRIVATE)
    fillet4_piece_11 = split(fillet4_piece_11, bisect_by=Plane(origin=(34.576923077, 12, -15.466872512), z_dir=(1, 0, 0)), keep=Keep.TOP, mode=Mode.PRIVATE)
    fillet4_piece_11 = split(fillet4_piece_11, bisect_by=Plane(origin=(37.49276705, 4, -15.466872512), z_dir=(0, 1, 0)), keep=Keep.TOP, mode=Mode.PRIVATE)
    add(fillet4_piece_11, mode=Mode.SUBTRACT)
    with BuildSketch(Plane(origin=(38.386923077, 20, -14.557692308), x_dir=(-1, 0, 0), z_dir=(0, -1, 0))) as fillet4_piece_12_section:
        with BuildLine():
            CenterArc((FILLET4_R, FILLET4_R), FILLET4_R, 180, 90)
            Line((0, FILLET4_R), (0, 0))
            Line((0, 0), (FILLET4_R, 0))
        make_face()
    fillet4_piece_12 = extrude(amount=33, mode=Mode.PRIVATE)
    fillet4_piece_12 = split(fillet4_piece_12, bisect_by=Plane(origin=(34.576923077, 2, -15.466872512), z_dir=(1, 0, 0)), keep=Keep.TOP, mode=Mode.PRIVATE)
    fillet4_piece_12 = split(fillet4_piece_12, bisect_by=Plane(origin=(37.49276705, 0, -15.466872512), z_dir=(0, 1, 0)), keep=Keep.TOP, mode=Mode.PRIVATE)
    fillet4_piece_12 = split(fillet4_piece_12, bisect_by=Plane(origin=(37.49276705, 4, -15.466872512), z_dir=(0, -1, 0)), keep=Keep.TOP, mode=Mode.PRIVATE)
    add(fillet4_piece_12, mode=Mode.SUBTRACT)
    with BuildSketch(Plane(origin=(38.386923077, 20, -14.557692308), x_dir=(-1, 0, 0), z_dir=(0, -1, 0))) as fillet4_piece_13_section:
        with BuildLine():
            CenterArc((FILLET4_R, FILLET4_R), FILLET4_R, 180, 90)
            Line((0, FILLET4_R), (0, 0))
            Line((0, 0), (FILLET4_R, 0))
        make_face()
    fillet4_piece_13 = extrude(amount=33, mode=Mode.PRIVATE)
    fillet4_piece_13 = split(fillet4_piece_13, bisect_by=Plane(origin=(34.576923077, -6.5, -14.51845576), z_dir=(-1, 0, 0)), keep=Keep.TOP, mode=Mode.PRIVATE)
    fillet4_piece_13 = split(fillet4_piece_13, bisect_by=Plane(origin=(34.482800084, 0, -14.51845576), z_dir=(0, -1, 0)), keep=Keep.TOP, mode=Mode.PRIVATE)
    add(fillet4_piece_13, mode=Mode.SUBTRACT)
    with BuildSketch(Plane(origin=(38.386923077, 20, -14.557692308), x_dir=(-1, 0, 0), z_dir=(0, -1, 0))) as fillet4_piece_14_section:
        with BuildLine():
            CenterArc((FILLET4_R, FILLET4_R), FILLET4_R, 180, 90)
            Line((0, FILLET4_R), (0, 0))
            Line((0, 0), (FILLET4_R, 0))
        make_face()
    fillet4_piece_14 = extrude(amount=33, mode=Mode.PRIVATE)
    fillet4_piece_14 = split(fillet4_piece_14, bisect_by=Plane(origin=(34.576923077, -6.5, -15.466872512), z_dir=(1, 0, 0)), keep=Keep.TOP, mode=Mode.PRIVATE)
    fillet4_piece_14 = split(fillet4_piece_14, bisect_by=Plane(origin=(37.49276705, 0, -15.466872512), z_dir=(0, -1, 0)), keep=Keep.TOP, mode=Mode.PRIVATE)
    add(fillet4_piece_14, mode=Mode.SUBTRACT)

    # Sketch65 → Boss-Extrude24 (add)
    with BuildSketch(Plane(origin=(0, 4, 0), x_dir=(1, 0, 0), z_dir=(0, 1, 0))):
        with Locations(Location((-4.923076923, 3.552692308, 0), (0, 0, 90))):
            Circle(SKETCH65_R)
        with Locations((-4.923076923, 3.552692308)):
            Circle(SKETCH65_R_2, mode=Mode.SUBTRACT)
    extrude(amount=BOSS_EXTRUDE24_DEPTH)

    # Cut-Extrude17: up to this face of the body (flat: up to its plane)
    cut_extrude17_end = Plane(part.part.faces().sort_by_distance((-5.195307942, 0.5, -3.552329957))[0])
    # Sketch66 → Cut-Extrude17 (cut, up to the picked face)
    with BuildSketch(Plane(origin=(0, 5, 0), x_dir=(1, 0, 0), z_dir=(0, 1, 0)), mode=Mode.PRIVATE) as cut_extrude17_sk1:
        with Locations(Location((-4.923076923, 3.552692308, 0), (0, 0, 270))):
            Circle(SKETCH66_R)
    cut_extrude17_tool1 = split(extrude(cut_extrude17_sk1.sketch, amount=-CUT_EXTRUDE17_REACH, mode=Mode.PRIVATE), bisect_by=cut_extrude17_end, keep=Keep.BOTH, mode=Mode.PRIVATE)
    add(cut_extrude17_tool1.solids().sort_by(Axis((-4.923077, 5, -3.552692), (0, -1, 0)))[0], mode=Mode.SUBTRACT)

    # Sketch67 → Boss-Extrude25 (add)
    with BuildSketch(Plane(origin=(0, 5, 0), x_dir=(1, 0, 0), z_dir=(0, 1, 0)).offset(BOSS_EXTRUDE25_START)):
        with Locations(Location((-4.923076923, 3.552692308, 0), (0, 0, 270))):
            Circle(SKETCH67_R)
        with Locations(Location((-4.923076923, 3.552692308, 0), (0, 0, 270))):
            Circle(SKETCH67_R_2, mode=Mode.SUBTRACT)
    extrude(amount=-BOSS_EXTRUDE25_DEPTH)


solid = part.part
